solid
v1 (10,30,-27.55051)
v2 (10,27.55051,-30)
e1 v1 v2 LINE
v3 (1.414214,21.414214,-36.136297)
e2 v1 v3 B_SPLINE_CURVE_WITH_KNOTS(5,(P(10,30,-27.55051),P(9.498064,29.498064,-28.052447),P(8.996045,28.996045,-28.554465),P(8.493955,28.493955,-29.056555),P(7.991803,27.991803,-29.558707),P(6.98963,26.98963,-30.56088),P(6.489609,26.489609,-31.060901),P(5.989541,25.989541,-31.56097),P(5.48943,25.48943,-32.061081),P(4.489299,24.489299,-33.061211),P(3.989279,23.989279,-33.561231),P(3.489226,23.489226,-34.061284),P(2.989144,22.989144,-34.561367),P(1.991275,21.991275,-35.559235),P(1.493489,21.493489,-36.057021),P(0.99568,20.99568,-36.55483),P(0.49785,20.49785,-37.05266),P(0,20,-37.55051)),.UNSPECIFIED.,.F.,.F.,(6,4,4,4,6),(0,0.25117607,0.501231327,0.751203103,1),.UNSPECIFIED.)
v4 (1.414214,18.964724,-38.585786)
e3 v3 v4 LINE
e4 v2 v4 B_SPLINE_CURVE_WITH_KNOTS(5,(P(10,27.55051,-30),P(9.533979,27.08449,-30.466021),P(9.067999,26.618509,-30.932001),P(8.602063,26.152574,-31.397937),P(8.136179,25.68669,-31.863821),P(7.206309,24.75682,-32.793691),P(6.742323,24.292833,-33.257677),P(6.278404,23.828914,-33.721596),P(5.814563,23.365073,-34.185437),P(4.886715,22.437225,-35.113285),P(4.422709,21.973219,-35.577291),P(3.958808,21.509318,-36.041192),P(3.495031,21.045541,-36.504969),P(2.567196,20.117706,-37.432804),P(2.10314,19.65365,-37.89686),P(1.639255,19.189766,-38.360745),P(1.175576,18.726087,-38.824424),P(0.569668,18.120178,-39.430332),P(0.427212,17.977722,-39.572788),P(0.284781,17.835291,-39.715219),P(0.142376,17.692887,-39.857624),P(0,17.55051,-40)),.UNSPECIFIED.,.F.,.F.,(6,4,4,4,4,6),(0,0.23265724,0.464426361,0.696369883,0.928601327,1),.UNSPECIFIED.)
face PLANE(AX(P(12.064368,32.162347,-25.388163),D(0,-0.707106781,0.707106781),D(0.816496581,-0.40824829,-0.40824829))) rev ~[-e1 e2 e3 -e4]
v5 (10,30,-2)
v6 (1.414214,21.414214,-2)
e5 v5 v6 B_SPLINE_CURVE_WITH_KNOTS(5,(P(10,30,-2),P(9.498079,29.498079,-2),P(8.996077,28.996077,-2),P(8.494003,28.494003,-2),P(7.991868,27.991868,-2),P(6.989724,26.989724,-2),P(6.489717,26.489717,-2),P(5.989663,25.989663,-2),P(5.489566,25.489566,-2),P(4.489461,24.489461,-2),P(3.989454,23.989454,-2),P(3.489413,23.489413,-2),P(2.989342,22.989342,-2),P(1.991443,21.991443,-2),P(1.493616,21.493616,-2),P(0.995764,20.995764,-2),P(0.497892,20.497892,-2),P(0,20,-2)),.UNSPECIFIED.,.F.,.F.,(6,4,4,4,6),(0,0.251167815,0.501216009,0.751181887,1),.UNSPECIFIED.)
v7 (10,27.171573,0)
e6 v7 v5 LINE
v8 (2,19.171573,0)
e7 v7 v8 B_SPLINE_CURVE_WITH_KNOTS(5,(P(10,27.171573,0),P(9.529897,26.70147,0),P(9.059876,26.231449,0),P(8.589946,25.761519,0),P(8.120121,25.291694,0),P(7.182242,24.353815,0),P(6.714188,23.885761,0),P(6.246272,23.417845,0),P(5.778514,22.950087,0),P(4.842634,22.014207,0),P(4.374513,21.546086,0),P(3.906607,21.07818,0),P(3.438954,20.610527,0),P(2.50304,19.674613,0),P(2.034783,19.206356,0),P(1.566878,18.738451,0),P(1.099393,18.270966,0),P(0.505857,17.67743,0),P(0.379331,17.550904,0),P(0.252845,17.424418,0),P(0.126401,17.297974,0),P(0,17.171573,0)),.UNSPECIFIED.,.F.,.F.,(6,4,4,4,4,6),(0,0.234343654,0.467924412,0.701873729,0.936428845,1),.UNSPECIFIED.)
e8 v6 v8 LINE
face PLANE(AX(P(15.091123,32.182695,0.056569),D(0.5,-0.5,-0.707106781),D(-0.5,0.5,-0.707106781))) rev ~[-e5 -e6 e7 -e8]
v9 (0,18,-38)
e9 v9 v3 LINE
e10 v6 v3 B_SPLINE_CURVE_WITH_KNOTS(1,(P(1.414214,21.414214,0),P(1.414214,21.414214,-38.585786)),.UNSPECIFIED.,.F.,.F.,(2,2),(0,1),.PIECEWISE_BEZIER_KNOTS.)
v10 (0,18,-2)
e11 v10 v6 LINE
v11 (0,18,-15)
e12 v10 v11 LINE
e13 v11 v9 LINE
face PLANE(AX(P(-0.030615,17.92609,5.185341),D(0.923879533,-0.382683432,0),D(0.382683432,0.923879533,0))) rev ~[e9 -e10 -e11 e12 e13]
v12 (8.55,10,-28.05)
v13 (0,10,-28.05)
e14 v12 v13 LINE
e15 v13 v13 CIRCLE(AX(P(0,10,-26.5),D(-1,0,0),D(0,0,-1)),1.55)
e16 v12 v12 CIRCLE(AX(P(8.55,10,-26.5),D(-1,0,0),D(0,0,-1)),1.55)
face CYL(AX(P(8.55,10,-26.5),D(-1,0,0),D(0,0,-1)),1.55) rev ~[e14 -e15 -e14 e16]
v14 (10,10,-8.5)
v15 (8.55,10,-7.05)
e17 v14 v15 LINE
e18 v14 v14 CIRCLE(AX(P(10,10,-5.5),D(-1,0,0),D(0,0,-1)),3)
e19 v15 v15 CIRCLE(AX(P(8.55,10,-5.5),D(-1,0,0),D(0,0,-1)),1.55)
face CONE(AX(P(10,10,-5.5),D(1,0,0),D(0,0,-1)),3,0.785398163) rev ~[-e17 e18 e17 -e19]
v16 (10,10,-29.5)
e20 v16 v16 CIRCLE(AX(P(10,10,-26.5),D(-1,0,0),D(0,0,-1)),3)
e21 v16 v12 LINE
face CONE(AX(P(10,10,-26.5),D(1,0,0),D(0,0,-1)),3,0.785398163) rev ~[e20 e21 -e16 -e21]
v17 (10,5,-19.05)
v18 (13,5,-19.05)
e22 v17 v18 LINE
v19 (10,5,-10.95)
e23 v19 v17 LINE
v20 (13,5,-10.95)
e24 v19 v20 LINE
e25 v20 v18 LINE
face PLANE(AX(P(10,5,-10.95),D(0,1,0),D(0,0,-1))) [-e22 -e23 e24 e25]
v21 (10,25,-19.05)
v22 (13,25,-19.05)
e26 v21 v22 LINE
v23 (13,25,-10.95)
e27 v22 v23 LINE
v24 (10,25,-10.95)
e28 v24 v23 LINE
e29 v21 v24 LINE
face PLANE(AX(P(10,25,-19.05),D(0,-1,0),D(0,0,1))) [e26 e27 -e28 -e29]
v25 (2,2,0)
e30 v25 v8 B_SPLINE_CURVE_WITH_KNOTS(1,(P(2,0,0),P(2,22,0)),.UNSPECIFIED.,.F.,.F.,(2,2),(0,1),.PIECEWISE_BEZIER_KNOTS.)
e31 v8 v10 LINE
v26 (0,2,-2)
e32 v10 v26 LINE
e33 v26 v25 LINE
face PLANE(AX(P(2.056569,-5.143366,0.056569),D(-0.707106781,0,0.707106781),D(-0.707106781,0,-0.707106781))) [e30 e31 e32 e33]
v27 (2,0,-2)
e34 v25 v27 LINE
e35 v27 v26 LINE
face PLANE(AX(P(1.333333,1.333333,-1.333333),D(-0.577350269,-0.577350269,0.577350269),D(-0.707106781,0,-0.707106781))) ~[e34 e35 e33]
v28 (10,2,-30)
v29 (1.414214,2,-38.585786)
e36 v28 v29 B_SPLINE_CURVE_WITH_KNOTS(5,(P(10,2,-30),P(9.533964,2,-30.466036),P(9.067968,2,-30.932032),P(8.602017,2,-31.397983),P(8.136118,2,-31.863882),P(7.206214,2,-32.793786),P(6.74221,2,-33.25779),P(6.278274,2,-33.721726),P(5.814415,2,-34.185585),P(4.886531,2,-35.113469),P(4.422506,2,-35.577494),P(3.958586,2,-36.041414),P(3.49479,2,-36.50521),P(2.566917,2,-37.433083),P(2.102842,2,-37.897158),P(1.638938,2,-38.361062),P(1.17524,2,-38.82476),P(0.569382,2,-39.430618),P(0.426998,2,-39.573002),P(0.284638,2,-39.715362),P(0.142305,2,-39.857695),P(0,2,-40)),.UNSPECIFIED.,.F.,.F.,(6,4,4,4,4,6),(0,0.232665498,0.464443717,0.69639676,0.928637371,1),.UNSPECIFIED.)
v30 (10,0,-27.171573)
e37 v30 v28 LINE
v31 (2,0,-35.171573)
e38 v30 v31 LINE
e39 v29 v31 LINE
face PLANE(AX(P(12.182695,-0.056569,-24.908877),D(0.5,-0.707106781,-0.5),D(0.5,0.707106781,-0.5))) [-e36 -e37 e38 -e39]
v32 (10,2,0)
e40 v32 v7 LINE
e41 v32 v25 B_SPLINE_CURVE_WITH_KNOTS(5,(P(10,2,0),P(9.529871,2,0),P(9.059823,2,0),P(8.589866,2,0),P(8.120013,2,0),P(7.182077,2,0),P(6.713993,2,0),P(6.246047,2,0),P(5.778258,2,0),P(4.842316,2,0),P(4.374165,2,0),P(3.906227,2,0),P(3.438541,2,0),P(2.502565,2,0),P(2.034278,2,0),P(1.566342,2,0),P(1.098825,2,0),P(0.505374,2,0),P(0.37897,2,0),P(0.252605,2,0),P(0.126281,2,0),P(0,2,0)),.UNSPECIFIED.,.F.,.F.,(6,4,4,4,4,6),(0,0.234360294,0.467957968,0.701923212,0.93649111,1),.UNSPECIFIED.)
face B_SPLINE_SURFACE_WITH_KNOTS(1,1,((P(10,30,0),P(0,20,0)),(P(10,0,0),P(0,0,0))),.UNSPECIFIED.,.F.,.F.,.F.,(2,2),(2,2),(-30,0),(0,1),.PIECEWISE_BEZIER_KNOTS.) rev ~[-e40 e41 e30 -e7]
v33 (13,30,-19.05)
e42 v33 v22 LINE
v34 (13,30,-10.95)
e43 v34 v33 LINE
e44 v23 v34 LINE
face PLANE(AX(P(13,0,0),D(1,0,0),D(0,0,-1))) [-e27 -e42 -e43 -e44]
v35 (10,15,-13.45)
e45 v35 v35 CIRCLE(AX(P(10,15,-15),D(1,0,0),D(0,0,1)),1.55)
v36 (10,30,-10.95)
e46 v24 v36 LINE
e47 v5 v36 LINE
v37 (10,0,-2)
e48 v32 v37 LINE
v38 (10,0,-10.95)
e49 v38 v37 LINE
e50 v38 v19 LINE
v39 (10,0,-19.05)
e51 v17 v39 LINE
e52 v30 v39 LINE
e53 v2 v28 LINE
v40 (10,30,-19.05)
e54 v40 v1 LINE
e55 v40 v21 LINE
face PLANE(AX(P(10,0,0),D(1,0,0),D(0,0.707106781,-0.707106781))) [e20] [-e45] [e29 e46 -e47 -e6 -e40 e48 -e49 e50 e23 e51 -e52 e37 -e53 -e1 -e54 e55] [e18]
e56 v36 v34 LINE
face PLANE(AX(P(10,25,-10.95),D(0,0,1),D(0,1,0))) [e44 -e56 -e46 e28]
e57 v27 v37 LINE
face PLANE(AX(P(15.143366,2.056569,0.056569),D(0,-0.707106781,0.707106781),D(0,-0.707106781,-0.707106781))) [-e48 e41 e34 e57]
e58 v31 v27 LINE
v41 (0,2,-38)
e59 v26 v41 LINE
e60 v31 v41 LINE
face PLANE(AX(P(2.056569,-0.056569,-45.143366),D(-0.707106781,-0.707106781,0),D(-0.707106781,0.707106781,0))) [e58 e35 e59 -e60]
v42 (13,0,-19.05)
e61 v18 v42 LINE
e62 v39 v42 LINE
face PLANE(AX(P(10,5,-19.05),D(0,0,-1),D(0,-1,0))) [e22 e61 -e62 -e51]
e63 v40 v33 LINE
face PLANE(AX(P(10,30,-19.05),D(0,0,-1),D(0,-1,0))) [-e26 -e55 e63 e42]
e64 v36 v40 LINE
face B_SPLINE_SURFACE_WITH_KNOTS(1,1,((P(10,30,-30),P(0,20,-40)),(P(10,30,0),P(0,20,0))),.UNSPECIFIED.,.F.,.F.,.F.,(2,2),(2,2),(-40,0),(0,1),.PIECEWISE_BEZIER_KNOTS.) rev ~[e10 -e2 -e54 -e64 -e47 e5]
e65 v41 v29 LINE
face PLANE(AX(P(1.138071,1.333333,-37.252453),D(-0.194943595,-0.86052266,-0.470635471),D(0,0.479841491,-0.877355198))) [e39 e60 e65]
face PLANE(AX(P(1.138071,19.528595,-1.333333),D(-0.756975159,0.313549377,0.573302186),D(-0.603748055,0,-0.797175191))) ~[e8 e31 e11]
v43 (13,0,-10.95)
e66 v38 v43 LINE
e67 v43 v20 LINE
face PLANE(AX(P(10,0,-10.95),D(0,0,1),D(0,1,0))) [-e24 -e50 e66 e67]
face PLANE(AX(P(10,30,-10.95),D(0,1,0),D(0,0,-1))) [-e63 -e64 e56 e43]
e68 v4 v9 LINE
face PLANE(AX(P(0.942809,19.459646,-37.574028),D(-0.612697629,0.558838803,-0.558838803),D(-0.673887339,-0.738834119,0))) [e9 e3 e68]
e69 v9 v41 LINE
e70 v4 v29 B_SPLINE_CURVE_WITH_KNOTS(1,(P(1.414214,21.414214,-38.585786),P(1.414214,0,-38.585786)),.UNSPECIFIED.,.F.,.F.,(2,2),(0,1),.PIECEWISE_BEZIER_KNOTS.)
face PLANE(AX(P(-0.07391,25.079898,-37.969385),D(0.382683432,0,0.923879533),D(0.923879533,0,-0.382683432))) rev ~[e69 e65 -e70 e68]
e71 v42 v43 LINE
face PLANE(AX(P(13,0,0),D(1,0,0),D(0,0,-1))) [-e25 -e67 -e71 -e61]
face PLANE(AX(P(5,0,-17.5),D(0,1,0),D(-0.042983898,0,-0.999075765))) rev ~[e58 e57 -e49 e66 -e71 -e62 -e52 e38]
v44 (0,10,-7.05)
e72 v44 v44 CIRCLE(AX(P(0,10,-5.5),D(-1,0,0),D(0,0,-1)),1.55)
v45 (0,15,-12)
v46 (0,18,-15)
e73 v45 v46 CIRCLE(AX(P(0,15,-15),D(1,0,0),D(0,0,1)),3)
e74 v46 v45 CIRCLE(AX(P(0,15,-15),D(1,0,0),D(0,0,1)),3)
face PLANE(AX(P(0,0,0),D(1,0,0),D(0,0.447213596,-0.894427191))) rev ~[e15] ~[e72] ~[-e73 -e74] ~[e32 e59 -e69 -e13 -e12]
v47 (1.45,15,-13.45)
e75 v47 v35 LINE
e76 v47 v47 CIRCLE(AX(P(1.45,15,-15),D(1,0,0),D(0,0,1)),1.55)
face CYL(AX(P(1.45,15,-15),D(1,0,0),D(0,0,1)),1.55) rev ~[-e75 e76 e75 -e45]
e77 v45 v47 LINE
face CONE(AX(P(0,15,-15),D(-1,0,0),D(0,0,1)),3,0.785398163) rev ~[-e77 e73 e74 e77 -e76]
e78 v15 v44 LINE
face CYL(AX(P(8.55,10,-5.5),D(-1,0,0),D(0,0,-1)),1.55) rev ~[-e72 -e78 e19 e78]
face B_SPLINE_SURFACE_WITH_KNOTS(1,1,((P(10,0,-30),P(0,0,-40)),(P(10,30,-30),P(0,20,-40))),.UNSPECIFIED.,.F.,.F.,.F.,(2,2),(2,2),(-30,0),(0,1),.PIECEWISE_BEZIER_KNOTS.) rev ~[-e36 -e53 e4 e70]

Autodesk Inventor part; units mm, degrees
ref_plane "XZ Plane" through (0, 0, 0) normal (0, 1, 0) x (-1, 0, 0)
ref_plane "XY Plane" through (0, 0, 0) normal (0, 0, 1) x (1, 0, 0)
sketch "草图1" plane through (0, 0, 0) normal (1, 0, 0) x (0, 1, 0)
  line L0 (0, 0) -> (20, 0)
  line L1 (20, 0) -> (20, -40)
  line L2 (20, -40) -> (0, -40)
  line L3 (0, -40) -> (0, 0)
  dimension "d0" = 20
  dimension "d1" = 40
ref_plane "工作平面1" through (10, 0, 0) normal (1, 0, 0) x (0, 1, 0)
sketch "草图2" plane through (10, 0, 0) normal (1, 0, 0) x (0, 1, 0)
  line L0 (0, 0) -> (30, 0)
  line L1 (30, 0) -> (30, -30)
  line L2 (30, -30) -> (0, -30)
  line L3 (0, -30) -> (0, 0)
  dimension "d7" = 30
  dimension "d8" = 30
loft "放样1" add profiles "草图2", "草图1"
sketch "草图3" plane through (10, 0, 0) normal (1, 0, 0) x (0, 0, -1)
  line L0 (0, 0) -> (0, 30) projected
  line L1 (30, 0) -> (0, 0) projected
  point P0 (5.5, 10)
  point P1 (26.5, 10)
  dimension "d14" = 21
  dimension "d15" = 5.5
  dimension "d16" = 10
hole "孔1" at (10, 10, -5.5) at (10, 10, -26.5) direction (-1, 0, 0) diameter 3.1 end through all countersink diameter 6 countersink angle 90
sketch "草图5" plane through (0, 0, 0) normal (-1, 0, 0) x (0, 0, 1)
  line L0 (0, 0) -> (0, 20) projected
  point P0 (-15, 15)
  dimension "d26" = 15
  dimension "d27" = 15
hole "孔2" at (0, 15, -15) direction (1, 0, 0) diameter 3.1 end through all countersink diameter 6 countersink angle 90
sketch "草图6" plane through (10, 0, 0) normal (1, 0, 0) x (0, 0, -1)
  line L0 (0, 30) -> (30, 30) projected
  line L1 (10.95, 30) -> (19.05, 30)
  line L2 (19.05, 30) -> (19.05, 25)
  line L3 (19.05, 25) -> (10.95, 25)
  line L4 (10.95, 25) -> (10.95, 30)
  line L5 (30, 0) -> (0, 0) projected
  line L6 (10.95, 5) -> (19.05, 5)
  line L7 (19.05, 5) -> (19.05, 0)
  line L8 (19.05, 0) -> (10.95, 0)
  line L9 (10.95, 0) -> (10.95, 5)
  line L10 (0, 0) -> (0, 30) projected
  point P0 (15, 30)
  dimension "d35" = 8.1
  dimension "d36" = 5
  dimension "d37" = 15
extrude "拉伸1" add sketch "草图6" along normal blind 3
chamfer "倒角1" distance 2 angle 45 8 edges at (5, 25, 0) (5, 25, -35) (5, 0, -35) (0, 10, -40) (0, 0, -20) (5, 0, 0) (0, 20, -20) (0, 10, 0)
properties part number "电源支架"
